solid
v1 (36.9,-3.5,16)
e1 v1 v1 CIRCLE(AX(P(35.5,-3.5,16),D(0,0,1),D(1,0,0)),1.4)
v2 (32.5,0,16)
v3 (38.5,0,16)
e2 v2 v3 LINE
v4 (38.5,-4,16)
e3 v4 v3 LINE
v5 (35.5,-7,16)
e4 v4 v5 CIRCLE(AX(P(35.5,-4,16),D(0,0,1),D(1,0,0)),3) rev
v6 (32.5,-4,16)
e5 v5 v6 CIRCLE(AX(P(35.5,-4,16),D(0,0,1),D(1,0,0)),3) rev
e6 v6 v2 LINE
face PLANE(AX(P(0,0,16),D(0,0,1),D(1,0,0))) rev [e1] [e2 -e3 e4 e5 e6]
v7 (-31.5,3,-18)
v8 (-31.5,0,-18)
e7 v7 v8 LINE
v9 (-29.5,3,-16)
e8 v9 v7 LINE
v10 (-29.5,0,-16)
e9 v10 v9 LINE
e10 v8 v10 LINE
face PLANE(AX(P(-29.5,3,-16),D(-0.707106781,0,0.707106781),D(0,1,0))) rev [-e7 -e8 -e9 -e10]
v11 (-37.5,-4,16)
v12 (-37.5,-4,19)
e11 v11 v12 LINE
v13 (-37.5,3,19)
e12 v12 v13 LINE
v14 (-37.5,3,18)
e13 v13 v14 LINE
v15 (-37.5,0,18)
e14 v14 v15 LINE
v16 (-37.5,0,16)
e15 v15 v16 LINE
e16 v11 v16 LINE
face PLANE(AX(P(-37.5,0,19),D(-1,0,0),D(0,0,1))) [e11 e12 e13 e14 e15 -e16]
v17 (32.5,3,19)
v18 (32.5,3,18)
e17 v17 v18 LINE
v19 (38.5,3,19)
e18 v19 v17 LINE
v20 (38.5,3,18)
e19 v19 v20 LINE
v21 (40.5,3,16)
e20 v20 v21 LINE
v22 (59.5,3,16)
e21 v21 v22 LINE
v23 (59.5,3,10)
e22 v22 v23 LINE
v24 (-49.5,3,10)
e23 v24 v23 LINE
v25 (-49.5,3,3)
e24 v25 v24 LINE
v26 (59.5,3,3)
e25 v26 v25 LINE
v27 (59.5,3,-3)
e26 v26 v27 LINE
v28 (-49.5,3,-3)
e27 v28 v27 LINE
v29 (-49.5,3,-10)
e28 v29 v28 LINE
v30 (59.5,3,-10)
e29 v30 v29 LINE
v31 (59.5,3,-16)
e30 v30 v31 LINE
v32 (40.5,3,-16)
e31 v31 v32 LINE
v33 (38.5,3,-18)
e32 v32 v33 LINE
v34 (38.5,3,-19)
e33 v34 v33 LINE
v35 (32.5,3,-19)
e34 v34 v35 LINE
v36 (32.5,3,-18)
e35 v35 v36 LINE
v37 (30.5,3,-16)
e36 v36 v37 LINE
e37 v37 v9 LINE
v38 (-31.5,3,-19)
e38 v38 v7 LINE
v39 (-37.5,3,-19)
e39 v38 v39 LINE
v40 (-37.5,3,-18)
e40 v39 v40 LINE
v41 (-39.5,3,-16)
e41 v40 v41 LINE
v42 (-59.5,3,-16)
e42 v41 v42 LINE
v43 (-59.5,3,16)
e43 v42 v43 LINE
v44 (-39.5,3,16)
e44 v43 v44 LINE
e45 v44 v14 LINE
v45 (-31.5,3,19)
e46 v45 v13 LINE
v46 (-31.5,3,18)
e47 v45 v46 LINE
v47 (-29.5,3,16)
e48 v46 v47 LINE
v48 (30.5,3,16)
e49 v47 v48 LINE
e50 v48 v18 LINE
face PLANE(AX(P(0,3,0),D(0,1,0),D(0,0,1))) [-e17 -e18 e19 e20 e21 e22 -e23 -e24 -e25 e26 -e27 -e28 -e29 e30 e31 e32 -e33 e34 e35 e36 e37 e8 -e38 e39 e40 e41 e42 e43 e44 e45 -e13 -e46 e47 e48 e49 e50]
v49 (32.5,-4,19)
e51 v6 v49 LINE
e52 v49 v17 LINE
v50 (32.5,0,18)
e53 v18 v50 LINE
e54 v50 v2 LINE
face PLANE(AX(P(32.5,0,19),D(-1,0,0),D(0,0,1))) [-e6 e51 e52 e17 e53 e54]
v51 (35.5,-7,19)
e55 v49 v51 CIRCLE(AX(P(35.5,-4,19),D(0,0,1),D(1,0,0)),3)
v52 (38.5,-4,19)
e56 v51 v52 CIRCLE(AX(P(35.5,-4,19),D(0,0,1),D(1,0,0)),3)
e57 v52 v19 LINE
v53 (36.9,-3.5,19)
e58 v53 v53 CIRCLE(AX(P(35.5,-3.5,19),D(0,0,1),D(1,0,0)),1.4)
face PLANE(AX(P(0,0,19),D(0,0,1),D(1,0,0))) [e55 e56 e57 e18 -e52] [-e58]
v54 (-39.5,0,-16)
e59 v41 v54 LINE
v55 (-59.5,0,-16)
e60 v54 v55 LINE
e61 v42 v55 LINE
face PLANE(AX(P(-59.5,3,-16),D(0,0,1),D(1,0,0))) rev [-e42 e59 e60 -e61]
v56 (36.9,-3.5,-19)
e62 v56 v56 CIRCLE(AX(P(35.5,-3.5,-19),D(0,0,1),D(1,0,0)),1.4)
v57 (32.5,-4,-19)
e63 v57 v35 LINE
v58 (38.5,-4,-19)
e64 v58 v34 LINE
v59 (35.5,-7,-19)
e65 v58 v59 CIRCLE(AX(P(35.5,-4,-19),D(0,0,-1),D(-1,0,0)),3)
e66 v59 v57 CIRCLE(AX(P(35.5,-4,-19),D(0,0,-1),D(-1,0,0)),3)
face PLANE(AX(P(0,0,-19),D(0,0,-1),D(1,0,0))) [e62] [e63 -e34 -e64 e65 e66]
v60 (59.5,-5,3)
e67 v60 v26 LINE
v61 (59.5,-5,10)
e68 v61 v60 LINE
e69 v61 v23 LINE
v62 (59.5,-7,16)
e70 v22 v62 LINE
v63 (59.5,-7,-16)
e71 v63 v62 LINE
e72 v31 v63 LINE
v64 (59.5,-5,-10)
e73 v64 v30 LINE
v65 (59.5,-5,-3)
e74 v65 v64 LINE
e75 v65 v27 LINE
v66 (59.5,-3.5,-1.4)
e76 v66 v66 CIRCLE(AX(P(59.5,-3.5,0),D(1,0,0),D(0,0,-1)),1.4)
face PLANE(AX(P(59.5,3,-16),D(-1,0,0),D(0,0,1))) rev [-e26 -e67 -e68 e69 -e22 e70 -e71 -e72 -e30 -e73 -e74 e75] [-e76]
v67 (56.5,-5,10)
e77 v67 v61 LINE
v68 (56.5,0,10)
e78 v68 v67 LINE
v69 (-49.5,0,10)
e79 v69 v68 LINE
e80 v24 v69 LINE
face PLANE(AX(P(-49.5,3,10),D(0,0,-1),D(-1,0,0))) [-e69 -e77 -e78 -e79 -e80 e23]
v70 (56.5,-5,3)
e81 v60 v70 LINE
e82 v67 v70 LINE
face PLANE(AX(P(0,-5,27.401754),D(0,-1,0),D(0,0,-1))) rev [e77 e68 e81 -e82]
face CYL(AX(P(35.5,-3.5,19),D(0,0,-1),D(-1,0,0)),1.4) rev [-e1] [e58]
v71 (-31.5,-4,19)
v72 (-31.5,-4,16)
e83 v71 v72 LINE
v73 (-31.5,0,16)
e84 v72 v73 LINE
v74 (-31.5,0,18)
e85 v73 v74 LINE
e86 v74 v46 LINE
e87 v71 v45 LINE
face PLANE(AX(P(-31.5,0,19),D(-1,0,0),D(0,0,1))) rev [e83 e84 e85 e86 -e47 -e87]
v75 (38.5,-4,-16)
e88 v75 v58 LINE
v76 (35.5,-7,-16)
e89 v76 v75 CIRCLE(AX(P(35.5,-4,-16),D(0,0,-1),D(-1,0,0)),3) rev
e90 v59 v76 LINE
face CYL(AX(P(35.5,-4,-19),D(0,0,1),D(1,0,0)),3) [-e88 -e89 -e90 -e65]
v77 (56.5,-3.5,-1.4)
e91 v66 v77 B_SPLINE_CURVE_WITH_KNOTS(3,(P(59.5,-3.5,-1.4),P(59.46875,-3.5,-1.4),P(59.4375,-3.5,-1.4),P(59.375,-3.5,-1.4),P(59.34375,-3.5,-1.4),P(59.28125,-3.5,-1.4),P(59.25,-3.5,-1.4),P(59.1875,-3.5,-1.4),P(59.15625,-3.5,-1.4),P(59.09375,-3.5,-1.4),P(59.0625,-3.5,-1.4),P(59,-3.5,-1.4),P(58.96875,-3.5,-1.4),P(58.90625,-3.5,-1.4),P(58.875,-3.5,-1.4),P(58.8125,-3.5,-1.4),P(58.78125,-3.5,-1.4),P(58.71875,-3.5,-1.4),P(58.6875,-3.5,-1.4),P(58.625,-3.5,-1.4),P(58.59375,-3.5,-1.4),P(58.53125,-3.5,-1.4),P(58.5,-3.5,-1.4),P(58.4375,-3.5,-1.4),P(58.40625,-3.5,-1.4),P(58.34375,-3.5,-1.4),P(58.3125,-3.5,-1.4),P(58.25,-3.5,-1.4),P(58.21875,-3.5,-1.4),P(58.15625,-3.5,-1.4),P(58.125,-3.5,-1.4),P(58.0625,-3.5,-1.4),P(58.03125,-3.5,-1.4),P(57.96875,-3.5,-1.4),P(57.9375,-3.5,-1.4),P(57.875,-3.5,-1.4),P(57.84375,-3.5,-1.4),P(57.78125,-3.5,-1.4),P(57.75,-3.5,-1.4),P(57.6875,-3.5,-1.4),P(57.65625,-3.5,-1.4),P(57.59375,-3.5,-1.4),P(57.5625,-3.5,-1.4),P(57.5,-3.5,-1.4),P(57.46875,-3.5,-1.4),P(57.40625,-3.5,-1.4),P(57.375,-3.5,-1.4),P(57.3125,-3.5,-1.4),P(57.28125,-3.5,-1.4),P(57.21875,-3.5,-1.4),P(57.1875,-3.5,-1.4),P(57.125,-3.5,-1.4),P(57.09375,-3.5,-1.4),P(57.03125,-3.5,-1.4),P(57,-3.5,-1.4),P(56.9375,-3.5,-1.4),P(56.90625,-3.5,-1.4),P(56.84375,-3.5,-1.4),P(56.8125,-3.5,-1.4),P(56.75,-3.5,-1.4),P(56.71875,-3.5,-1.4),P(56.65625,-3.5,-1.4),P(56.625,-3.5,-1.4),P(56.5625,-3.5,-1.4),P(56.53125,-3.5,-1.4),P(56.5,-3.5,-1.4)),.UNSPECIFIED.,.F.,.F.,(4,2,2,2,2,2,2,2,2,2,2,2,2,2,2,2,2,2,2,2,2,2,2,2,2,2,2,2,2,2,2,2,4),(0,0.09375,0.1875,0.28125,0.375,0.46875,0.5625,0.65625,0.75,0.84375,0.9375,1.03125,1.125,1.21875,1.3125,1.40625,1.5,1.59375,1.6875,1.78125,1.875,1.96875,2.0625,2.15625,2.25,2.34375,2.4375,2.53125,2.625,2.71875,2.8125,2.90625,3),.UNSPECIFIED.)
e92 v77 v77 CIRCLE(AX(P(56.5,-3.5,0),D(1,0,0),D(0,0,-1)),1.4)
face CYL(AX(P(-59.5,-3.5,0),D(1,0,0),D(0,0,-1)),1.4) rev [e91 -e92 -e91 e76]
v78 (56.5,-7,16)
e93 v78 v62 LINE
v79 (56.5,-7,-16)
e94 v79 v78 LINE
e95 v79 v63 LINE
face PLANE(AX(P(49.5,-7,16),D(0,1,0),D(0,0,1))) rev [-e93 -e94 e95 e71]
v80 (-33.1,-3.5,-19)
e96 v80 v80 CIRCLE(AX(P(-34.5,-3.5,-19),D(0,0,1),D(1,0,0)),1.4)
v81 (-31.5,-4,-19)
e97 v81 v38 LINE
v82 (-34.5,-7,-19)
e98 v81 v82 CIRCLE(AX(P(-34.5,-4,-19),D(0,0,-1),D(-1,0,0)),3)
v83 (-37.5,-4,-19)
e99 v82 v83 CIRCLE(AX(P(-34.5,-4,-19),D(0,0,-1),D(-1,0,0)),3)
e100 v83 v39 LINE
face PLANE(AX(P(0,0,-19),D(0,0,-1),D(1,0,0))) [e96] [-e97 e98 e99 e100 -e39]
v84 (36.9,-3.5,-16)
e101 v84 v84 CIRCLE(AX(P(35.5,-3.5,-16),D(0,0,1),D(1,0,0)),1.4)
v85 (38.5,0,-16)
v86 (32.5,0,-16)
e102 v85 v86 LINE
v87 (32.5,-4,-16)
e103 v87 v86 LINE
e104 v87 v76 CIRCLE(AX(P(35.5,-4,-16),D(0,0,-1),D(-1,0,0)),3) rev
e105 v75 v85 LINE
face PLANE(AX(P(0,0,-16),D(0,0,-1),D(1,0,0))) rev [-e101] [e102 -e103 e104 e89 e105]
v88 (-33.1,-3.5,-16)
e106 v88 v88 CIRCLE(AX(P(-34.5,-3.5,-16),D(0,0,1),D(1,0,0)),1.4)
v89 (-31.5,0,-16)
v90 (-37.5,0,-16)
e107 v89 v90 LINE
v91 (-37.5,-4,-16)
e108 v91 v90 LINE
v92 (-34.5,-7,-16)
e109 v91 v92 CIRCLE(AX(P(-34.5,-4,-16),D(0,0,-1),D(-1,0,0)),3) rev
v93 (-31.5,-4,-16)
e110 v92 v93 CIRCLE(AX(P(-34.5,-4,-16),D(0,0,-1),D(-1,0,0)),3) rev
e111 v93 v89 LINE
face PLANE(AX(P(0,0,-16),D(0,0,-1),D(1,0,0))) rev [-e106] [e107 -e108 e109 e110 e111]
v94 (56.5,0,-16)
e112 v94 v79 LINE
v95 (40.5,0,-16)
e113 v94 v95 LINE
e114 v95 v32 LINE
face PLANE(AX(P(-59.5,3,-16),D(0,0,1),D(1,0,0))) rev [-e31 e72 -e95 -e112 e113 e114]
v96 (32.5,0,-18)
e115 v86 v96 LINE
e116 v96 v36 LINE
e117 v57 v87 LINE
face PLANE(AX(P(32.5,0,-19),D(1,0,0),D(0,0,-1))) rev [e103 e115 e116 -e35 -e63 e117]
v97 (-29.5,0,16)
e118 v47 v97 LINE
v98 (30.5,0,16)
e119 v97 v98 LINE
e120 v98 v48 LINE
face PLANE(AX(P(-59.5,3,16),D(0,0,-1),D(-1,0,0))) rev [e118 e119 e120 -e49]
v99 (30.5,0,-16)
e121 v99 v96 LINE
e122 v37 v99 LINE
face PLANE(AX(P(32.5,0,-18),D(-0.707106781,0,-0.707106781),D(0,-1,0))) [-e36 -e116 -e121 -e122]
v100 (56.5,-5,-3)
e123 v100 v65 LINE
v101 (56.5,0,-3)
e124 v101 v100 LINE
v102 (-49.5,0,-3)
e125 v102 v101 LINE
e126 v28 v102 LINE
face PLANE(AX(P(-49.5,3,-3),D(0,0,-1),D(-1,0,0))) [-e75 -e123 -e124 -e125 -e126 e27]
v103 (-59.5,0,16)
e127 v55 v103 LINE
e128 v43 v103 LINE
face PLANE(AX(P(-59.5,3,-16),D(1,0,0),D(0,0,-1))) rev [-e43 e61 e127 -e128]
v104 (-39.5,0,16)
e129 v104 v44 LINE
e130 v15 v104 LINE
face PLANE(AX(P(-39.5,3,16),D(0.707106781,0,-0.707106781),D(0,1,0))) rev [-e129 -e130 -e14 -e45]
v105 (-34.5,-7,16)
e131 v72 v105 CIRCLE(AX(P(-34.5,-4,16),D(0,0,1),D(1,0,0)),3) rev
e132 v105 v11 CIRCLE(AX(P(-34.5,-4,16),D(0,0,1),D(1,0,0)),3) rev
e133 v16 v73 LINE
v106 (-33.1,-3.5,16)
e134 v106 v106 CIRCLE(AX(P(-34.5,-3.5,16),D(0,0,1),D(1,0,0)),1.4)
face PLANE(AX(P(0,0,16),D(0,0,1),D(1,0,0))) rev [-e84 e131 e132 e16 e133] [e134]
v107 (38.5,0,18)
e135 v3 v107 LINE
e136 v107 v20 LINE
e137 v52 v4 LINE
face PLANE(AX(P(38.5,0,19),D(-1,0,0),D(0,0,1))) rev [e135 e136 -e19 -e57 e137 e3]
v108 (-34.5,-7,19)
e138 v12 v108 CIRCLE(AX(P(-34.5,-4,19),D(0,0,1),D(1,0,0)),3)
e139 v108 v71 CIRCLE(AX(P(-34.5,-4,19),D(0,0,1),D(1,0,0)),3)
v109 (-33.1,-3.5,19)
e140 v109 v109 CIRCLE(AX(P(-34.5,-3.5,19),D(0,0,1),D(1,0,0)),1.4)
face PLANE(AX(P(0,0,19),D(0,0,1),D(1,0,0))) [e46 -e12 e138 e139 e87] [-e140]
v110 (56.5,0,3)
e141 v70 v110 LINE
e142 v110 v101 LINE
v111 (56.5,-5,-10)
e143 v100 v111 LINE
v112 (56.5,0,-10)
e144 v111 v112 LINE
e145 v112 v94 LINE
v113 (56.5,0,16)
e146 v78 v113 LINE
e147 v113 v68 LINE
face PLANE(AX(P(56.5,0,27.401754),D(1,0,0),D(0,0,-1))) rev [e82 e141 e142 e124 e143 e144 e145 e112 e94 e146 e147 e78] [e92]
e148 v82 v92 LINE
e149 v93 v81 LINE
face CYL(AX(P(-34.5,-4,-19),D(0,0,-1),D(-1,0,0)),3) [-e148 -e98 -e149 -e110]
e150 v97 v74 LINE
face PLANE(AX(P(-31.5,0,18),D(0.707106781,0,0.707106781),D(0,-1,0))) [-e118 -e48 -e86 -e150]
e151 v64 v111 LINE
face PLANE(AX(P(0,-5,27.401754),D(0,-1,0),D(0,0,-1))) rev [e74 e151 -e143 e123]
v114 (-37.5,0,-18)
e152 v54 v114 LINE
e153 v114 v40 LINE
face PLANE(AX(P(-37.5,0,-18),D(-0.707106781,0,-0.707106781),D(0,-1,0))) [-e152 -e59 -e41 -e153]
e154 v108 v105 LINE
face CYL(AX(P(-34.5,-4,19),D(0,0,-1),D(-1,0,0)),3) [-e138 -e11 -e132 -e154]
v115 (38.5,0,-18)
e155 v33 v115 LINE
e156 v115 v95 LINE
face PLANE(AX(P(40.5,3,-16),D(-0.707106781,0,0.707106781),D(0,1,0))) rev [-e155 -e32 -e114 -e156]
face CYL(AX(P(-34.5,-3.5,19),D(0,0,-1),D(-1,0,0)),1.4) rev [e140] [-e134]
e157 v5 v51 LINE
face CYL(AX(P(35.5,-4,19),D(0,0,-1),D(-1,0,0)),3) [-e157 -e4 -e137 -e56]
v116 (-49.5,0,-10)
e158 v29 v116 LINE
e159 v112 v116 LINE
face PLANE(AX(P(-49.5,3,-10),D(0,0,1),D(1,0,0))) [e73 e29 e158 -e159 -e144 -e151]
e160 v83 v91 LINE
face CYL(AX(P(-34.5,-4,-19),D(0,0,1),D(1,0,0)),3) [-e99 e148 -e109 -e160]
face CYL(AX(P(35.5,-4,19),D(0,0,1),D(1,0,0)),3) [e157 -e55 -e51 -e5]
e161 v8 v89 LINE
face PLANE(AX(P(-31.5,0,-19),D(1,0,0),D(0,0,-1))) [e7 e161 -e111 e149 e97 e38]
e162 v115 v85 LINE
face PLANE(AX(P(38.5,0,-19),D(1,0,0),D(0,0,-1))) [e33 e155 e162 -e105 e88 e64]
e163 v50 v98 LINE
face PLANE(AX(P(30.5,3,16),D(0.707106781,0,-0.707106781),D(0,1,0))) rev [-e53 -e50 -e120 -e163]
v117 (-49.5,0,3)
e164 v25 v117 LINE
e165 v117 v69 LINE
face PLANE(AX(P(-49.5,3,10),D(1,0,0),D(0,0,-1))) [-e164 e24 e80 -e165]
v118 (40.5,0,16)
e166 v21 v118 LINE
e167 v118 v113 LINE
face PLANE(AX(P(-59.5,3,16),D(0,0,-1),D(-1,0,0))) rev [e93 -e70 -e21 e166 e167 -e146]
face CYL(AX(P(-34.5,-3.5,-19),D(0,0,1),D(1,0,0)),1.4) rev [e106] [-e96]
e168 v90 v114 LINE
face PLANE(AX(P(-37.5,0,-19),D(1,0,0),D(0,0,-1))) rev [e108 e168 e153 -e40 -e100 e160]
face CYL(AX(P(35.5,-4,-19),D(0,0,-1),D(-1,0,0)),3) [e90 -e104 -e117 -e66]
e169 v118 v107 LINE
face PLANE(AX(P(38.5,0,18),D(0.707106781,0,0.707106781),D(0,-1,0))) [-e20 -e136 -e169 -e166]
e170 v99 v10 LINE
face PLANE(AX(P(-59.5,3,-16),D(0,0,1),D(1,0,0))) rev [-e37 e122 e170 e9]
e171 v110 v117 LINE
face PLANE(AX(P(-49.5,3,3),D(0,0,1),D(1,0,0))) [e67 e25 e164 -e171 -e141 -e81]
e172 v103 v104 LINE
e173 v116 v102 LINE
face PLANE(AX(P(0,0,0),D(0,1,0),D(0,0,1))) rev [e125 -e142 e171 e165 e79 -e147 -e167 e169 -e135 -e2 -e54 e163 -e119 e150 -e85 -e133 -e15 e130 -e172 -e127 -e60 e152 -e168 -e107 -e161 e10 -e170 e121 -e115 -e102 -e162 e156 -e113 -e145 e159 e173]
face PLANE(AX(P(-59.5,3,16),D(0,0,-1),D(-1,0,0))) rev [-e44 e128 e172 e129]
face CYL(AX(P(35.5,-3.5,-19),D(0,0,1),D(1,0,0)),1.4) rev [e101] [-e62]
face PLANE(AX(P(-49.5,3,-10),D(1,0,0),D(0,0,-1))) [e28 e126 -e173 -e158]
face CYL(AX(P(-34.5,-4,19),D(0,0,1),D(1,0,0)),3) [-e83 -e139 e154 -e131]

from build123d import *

# Parameters (mm, degrees)
SKETCH1_W           = 119
SKETCH1_H           = 32
SKETCH1_W_2         = 105
SKETCH1_H_2         = 7
BOSS_EXTRUDE1_DEPTH = 3
SKETCH2_W           = 6
SKETCH2_H           = 7
SKETCH2_R           = 1.4
SKETCH2_H_2         = 3
BOSS_EXTRUDE2_DEPTH = 3
CHAMFER1_SIZE       = 2
FILLET1_R           = 3
SKETCH3_W           = 3
SKETCH3_H           = 11
BOSS_EXTRUDE4_DEPTH = 32
SKETCH4_W           = 4
SKETCH4_H           = 7
CUT_EXTRUDE1_DEPTH  = 8
SKETCH5_R           = 1.4
CUT_EXTRUDE2_DEPTH  = 122.008264181
SKETCH6_W           = 32
SKETCH6_H           = 4
CUT_EXTRUDE3_DEPTH  = 10


with BuildPart() as part:
    # Sketch1 → Boss-Extrude1 (new body)
    with BuildSketch(Plane(origin=(0, 0, 0), x_dir=(1, 0, 0), z_dir=(0, 1, 0))):
        Rectangle(SKETCH1_W, SKETCH1_H)
        with Locations((3, 6.5)):
            Rectangle(SKETCH1_W_2, SKETCH1_H_2, mode=Mode.SUBTRACT)
        with Locations((3, -6.5)):
            Rectangle(SKETCH1_W_2, SKETCH1_H_2, mode=Mode.SUBTRACT)
    extrude(amount=BOSS_EXTRUDE1_DEPTH)

    # Sketch2 → Boss-Extrude2 (add)
    # profile 1 of 4: a face of its own
    with BuildSketch(Plane.XY.offset(16)):
        with Locations((35.5, -3.5)):
            Rectangle(SKETCH2_W, SKETCH2_H)
        with Locations((35.5, -3.5)):
            Circle(SKETCH2_R, mode=Mode.SUBTRACT)
    # profile 2 of 4: a face of its own
    with BuildSketch(Plane.XY.offset(16)):
        with Locations((35.5, 1.5)):
            Rectangle(SKETCH2_W, SKETCH2_H_2)
    # profile 3 of 4: a face of its own
    with BuildSketch(Plane.XY.offset(16)):
        with Locations((-34.5, -3.5)):
            Rectangle(SKETCH2_W, SKETCH2_H)
        with Locations((-34.5, -3.5)):
            Circle(SKETCH2_R, mode=Mode.SUBTRACT)
    # profile 4 of 4: a face of its own
    with BuildSketch(Plane.XY.offset(16)):
        with Locations((-34.5, 1.5)):
            Rectangle(SKETCH2_W, SKETCH2_H_2)
    boss_extrude2 = extrude(amount=BOSS_EXTRUDE2_DEPTH)

    # Mirror4: Boss-Extrude2 across plane
    add(boss_extrude2.mirror(Plane.XY))

    # Chamfer1
    chamfer1_edges = [part.edges().sort_by_distance(p)[0] for p in [
        (-31.5, 1.5, -16),
        (38.5, 1.5, 16),
        (32.5, 1.5, 16),
        (-37.5, 1.5, 16),
        (-31.5, 1.5, 16),
        (32.5, 1.5, -16),
        (38.5, 1.5, -16),
        (-37.5, 1.5, -16),
    ]]
    chamfer(chamfer1_edges, length=CHAMFER1_SIZE)

    # Fillet1
    fillet1_edges = [part.edges().sort_by_distance(p)[0] for p in [
        (32.5, -7, 17.5),
        (38.5, -7, 17.5),
        (-37.5, -7, 17.5),
        (-31.5, -7, 17.5),
        (38.5, -7, -17.5),
        (32.5, -7, -17.5),
        (-31.5, -7, -17.5),
        (-37.5, -7, -17.5),
    ]]
    fillet(fillet1_edges, radius=FILLET1_R - 0.0001)  # a hair under: the kernel refuses the full size

    # Sketch3 → Boss-Extrude4 (add)
    with BuildSketch(Plane(origin=(0, 0, -16), x_dir=(-1, 0, 0), z_dir=(0, 0, -1))):
        with Locations((-58, -5.5)):
            Rectangle(SKETCH3_W, SKETCH3_H)
    extrude(amount=-BOSS_EXTRUDE4_DEPTH)

    # Sketch4 → Cut-Extrude1 (cut)
    with BuildSketch(Plane(origin=(0, 3, 0), x_dir=(1, 0, 0), z_dir=(0, 1, 0))):
        with Locations((57.5, 6.5)):
            Rectangle(SKETCH4_W, SKETCH4_H)
        with Locations((57.5, -6.5)):
            Rectangle(SKETCH4_W, SKETCH4_H)
    extrude(amount=-CUT_EXTRUDE1_DEPTH, mode=Mode.SUBTRACT)

    # Sketch5 → Cut-Extrude2 (cut, through all)
    with BuildSketch(Plane(origin=(59.5, 0, 0), x_dir=(0, 0, -1), z_dir=(1, 0, 0))):
        with Locations((0, -3.5)):
            Circle(SKETCH5_R)
    extrude(amount=-CUT_EXTRUDE2_DEPTH, mode=Mode.SUBTRACT)

    # Sketch6 → Cut-Extrude3 (cut)
    with BuildSketch(Plane(origin=(59.5, 0, 0), x_dir=(0, 0, -1), z_dir=(1, 0, 0))):
        with Locations((0, -9)):
            Rectangle(SKETCH6_W, SKETCH6_H)
    extrude(amount=-CUT_EXTRUDE3_DEPTH, mode=Mode.SUBTRACT)


solid = part.part
